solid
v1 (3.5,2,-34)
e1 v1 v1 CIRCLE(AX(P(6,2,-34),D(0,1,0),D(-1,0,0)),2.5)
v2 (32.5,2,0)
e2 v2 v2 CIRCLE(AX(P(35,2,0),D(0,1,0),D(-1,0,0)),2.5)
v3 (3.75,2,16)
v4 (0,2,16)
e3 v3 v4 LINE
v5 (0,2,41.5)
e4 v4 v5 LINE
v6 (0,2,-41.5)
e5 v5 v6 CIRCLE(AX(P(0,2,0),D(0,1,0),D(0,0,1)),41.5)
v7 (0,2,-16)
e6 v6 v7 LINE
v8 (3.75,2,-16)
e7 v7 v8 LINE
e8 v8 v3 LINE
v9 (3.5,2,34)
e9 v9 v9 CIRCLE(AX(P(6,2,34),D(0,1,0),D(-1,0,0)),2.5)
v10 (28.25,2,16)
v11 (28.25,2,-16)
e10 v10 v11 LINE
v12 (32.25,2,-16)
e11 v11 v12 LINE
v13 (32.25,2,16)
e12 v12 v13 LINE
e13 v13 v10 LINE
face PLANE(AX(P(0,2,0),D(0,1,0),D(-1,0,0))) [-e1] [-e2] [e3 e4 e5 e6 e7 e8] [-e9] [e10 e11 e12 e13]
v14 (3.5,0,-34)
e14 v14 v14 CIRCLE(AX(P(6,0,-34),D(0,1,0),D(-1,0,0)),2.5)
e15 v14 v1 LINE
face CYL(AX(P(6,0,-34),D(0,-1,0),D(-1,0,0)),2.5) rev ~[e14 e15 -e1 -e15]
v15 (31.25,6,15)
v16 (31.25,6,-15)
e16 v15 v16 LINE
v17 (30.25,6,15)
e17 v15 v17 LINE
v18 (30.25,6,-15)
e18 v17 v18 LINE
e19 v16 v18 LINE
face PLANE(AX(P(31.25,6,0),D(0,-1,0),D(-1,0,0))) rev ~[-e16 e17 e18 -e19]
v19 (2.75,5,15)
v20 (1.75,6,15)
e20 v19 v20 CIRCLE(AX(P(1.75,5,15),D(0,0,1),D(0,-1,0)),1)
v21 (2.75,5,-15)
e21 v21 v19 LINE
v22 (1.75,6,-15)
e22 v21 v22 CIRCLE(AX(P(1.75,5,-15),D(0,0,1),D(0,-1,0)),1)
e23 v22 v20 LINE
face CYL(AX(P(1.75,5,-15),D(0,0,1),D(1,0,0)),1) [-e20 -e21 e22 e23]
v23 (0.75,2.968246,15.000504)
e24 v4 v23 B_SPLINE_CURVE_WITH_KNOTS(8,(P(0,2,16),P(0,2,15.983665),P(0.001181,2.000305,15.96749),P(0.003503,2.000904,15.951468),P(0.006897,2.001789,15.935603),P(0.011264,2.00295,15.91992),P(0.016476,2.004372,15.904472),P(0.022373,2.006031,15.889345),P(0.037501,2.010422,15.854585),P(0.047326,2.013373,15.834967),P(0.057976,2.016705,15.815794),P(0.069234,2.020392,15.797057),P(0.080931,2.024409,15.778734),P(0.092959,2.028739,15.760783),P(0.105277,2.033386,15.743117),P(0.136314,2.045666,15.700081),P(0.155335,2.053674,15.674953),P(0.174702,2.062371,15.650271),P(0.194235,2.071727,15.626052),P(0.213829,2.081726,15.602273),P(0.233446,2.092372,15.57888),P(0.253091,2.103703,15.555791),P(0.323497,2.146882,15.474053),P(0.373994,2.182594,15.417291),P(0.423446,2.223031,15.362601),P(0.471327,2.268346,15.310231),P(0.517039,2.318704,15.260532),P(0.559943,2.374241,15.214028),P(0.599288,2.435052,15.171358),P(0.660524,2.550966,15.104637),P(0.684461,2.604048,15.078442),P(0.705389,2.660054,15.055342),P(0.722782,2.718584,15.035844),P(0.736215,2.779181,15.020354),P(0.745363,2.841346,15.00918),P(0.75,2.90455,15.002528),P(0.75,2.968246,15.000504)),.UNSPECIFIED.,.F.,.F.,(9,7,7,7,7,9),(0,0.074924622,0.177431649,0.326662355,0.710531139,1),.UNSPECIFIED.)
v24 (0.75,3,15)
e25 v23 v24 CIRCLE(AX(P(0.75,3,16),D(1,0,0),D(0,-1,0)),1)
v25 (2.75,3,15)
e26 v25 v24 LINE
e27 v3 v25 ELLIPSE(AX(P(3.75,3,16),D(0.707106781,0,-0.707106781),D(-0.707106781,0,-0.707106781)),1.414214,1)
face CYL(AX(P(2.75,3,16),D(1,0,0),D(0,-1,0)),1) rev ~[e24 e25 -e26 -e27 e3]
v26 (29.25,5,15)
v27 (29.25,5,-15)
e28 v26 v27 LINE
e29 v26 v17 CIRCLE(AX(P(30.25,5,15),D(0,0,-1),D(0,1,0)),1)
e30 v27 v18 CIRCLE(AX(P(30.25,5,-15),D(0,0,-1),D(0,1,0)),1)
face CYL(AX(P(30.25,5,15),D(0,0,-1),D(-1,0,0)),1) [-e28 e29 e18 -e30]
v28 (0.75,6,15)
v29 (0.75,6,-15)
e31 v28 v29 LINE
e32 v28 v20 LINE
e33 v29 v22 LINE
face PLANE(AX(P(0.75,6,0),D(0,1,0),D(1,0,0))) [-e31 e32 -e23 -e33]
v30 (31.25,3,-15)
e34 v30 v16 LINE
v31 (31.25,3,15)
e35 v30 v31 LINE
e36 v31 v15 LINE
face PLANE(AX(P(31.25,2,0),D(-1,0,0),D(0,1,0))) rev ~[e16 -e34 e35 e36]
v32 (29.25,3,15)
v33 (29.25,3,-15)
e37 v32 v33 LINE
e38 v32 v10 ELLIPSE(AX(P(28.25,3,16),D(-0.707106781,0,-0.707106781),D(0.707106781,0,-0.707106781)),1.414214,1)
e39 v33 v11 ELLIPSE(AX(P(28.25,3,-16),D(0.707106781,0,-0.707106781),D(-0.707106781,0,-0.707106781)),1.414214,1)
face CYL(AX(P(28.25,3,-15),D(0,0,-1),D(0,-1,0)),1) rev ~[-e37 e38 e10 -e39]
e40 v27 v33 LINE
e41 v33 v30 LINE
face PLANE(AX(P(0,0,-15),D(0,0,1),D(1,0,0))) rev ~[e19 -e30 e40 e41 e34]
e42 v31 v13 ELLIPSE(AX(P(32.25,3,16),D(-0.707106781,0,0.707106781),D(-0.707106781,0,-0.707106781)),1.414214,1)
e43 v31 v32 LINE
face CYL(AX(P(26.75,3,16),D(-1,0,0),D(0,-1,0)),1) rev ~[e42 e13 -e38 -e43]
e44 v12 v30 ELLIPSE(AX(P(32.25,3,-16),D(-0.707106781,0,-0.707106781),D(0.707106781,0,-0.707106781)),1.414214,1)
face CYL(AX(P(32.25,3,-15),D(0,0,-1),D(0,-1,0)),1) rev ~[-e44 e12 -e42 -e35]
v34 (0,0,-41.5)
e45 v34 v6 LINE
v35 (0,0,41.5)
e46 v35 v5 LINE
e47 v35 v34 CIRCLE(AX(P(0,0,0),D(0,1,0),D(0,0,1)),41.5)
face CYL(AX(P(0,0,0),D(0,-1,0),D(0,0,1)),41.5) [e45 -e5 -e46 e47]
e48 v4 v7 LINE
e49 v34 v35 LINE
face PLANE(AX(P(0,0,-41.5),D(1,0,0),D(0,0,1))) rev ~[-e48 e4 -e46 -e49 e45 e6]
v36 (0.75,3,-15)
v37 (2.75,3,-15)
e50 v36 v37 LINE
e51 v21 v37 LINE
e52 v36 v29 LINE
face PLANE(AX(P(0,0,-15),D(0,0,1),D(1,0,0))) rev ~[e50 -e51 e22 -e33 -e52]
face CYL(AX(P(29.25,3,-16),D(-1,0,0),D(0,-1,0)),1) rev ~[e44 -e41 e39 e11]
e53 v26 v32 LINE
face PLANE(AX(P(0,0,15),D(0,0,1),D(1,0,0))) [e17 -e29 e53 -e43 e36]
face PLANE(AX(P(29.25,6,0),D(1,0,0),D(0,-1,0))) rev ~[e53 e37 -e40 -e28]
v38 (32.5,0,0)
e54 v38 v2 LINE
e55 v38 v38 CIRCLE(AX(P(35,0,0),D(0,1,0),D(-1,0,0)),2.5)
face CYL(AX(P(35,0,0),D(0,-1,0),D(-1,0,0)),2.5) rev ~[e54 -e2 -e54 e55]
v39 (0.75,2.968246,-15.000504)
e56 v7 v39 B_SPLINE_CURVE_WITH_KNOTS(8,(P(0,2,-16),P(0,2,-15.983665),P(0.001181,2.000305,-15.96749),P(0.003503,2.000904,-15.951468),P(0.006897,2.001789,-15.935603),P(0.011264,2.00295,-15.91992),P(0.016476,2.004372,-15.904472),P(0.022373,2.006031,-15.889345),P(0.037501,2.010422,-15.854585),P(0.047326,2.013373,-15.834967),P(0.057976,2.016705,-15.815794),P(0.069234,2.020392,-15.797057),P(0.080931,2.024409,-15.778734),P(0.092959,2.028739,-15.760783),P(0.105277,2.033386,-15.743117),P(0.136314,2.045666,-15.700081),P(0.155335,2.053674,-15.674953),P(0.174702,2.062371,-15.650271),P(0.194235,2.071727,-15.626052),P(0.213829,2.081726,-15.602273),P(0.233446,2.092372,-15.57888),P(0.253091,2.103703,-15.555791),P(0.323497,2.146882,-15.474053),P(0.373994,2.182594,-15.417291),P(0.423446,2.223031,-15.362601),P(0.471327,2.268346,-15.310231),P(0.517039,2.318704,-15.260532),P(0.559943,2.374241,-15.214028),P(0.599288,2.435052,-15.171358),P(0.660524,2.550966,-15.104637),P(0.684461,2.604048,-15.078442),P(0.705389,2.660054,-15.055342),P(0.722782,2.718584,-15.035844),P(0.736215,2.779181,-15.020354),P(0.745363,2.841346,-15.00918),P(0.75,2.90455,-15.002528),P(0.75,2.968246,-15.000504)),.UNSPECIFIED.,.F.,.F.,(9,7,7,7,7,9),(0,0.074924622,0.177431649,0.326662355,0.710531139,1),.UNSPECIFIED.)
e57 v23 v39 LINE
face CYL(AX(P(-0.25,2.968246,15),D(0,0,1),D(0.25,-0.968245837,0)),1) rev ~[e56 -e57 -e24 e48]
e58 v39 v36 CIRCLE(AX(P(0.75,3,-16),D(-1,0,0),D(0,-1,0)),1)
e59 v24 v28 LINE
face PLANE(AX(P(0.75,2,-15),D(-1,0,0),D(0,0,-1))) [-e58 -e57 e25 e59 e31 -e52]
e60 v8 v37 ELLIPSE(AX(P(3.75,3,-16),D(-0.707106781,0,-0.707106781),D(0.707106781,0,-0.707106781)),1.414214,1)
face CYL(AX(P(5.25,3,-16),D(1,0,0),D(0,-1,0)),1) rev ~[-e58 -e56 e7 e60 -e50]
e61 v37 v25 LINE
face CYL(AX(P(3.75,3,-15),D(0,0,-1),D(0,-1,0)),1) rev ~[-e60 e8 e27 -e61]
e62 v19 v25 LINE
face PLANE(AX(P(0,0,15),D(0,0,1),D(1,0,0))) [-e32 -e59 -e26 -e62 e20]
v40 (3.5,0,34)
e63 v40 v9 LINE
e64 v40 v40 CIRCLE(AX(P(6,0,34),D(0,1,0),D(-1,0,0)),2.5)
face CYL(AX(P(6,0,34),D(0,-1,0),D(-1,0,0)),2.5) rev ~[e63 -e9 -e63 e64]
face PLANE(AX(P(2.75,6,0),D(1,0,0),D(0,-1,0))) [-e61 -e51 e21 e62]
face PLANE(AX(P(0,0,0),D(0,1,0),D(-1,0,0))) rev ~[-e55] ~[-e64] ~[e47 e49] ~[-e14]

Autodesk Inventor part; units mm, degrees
ref_plane "YZ Plane" through (0, 0, 0) normal (1, 0, 0) x (0, 1, 0)
ref_plane "XZ Plane" through (0, 0, 0) normal (0, 1, 0) x (-1, 0, 0)
ref_plane "XY Plane" through (0, 0, 0) normal (0, 0, 1) x (1, 0, 0)
sketch "Sketch1" plane through (0, 0, 0) normal (0, 1, 0) x (-1, 0, 0)
  circle A0 centre (0, 0) radius 41.5 construction
  line L0 (0, -41.5) -> (0, 41.5)
  arc A1 (0, 41.5) -> (0, -41.5) centre (0, 0) ccw
  circle A2 centre (-6, -34) radius 2.5
  circle A3 centre (-6, 34) radius 2.5
  line L1 (0, 0) -> (-41.5, 0) construction
  circle A4 centre (-35, 0) radius 2.5
  dimension "d0" = 83
  dimension "d1" = 83
  dimension "d2" = 5
  dimension "d3" = 6
  dimension "d4" = 34
  dimension "d5" = 34
  dimension "d6" = 35
extrude "Extrusion1" add sketch "Sketch1" along normal blind 2
sketch "Espacio9V" plane through (0, 2, 0) normal (0, 1, 0) x (1, 0, 0)
  line L0 (2.75, -24.25) -> (29.25, -24.25)
  line L1 (29.25, -24.25) -> (29.25, 24.25)
  line L2 (29.25, 24.25) -> (2.75, 24.25)
  line L3 (2.75, 24.25) -> (2.75, -24.25)
  line L4 (2.75, -24.25) -> (29.25, 24.25) construction
  line L5 (29.25, -24.25) -> (2.75, 24.25) construction
  line L6 (0, 0) -> (41.5, 0) construction
  arc A0 (0, -41.5) -> (0, 41.5) centre (0, 0) ccw construction
  point P0 (16, 0)
  dimension "d11" = 26.5
  dimension "d12" = 48.5
  dimension "d13" = 16
sketch "Sketch3" plane through (0, 0, 0) normal (0, 0, 1) x (1, 0, 0)
  line L0 (29.25, 2) -> (31.25, 2)
  line L1 (31.25, 2) -> (31.25, 6)
  line L2 (31.25, 6) -> (29.25, 6)
  line L3 (29.25, 6) -> (29.25, 2)
  line L4 (2.75, 2) -> (0.75, 2)
  line L5 (0.75, 2) -> (0.75, 6)
  line L6 (0.75, 6) -> (2.75, 6)
  line L7 (2.75, 6) -> (2.75, 2)
  point P0 (0, 0)
  point P1 (2.75, 2)
  dimension "d14" = 2
  dimension "d15" = 4
  dimension "d16" = 4
  dimension "d17" = 2
extrude "Extrusion2" add sketch "Sketch3" along normal mid plane 30
fillet "Fillet1" radius 1 8 edges at (30.25, 2, 15) (29.25, 2, 0) (30.25, 2, -15) (31.25, 2, 0) (2.75, 2, 0) (1.75, 2, 15) (1.75, 2, -15) (0.75, 2, 0)
fillet "Fillet2" radius 1 2 edges at (2.75, 6, 0) (29.25, 6, 0)
properties part number "_3DPrint"
